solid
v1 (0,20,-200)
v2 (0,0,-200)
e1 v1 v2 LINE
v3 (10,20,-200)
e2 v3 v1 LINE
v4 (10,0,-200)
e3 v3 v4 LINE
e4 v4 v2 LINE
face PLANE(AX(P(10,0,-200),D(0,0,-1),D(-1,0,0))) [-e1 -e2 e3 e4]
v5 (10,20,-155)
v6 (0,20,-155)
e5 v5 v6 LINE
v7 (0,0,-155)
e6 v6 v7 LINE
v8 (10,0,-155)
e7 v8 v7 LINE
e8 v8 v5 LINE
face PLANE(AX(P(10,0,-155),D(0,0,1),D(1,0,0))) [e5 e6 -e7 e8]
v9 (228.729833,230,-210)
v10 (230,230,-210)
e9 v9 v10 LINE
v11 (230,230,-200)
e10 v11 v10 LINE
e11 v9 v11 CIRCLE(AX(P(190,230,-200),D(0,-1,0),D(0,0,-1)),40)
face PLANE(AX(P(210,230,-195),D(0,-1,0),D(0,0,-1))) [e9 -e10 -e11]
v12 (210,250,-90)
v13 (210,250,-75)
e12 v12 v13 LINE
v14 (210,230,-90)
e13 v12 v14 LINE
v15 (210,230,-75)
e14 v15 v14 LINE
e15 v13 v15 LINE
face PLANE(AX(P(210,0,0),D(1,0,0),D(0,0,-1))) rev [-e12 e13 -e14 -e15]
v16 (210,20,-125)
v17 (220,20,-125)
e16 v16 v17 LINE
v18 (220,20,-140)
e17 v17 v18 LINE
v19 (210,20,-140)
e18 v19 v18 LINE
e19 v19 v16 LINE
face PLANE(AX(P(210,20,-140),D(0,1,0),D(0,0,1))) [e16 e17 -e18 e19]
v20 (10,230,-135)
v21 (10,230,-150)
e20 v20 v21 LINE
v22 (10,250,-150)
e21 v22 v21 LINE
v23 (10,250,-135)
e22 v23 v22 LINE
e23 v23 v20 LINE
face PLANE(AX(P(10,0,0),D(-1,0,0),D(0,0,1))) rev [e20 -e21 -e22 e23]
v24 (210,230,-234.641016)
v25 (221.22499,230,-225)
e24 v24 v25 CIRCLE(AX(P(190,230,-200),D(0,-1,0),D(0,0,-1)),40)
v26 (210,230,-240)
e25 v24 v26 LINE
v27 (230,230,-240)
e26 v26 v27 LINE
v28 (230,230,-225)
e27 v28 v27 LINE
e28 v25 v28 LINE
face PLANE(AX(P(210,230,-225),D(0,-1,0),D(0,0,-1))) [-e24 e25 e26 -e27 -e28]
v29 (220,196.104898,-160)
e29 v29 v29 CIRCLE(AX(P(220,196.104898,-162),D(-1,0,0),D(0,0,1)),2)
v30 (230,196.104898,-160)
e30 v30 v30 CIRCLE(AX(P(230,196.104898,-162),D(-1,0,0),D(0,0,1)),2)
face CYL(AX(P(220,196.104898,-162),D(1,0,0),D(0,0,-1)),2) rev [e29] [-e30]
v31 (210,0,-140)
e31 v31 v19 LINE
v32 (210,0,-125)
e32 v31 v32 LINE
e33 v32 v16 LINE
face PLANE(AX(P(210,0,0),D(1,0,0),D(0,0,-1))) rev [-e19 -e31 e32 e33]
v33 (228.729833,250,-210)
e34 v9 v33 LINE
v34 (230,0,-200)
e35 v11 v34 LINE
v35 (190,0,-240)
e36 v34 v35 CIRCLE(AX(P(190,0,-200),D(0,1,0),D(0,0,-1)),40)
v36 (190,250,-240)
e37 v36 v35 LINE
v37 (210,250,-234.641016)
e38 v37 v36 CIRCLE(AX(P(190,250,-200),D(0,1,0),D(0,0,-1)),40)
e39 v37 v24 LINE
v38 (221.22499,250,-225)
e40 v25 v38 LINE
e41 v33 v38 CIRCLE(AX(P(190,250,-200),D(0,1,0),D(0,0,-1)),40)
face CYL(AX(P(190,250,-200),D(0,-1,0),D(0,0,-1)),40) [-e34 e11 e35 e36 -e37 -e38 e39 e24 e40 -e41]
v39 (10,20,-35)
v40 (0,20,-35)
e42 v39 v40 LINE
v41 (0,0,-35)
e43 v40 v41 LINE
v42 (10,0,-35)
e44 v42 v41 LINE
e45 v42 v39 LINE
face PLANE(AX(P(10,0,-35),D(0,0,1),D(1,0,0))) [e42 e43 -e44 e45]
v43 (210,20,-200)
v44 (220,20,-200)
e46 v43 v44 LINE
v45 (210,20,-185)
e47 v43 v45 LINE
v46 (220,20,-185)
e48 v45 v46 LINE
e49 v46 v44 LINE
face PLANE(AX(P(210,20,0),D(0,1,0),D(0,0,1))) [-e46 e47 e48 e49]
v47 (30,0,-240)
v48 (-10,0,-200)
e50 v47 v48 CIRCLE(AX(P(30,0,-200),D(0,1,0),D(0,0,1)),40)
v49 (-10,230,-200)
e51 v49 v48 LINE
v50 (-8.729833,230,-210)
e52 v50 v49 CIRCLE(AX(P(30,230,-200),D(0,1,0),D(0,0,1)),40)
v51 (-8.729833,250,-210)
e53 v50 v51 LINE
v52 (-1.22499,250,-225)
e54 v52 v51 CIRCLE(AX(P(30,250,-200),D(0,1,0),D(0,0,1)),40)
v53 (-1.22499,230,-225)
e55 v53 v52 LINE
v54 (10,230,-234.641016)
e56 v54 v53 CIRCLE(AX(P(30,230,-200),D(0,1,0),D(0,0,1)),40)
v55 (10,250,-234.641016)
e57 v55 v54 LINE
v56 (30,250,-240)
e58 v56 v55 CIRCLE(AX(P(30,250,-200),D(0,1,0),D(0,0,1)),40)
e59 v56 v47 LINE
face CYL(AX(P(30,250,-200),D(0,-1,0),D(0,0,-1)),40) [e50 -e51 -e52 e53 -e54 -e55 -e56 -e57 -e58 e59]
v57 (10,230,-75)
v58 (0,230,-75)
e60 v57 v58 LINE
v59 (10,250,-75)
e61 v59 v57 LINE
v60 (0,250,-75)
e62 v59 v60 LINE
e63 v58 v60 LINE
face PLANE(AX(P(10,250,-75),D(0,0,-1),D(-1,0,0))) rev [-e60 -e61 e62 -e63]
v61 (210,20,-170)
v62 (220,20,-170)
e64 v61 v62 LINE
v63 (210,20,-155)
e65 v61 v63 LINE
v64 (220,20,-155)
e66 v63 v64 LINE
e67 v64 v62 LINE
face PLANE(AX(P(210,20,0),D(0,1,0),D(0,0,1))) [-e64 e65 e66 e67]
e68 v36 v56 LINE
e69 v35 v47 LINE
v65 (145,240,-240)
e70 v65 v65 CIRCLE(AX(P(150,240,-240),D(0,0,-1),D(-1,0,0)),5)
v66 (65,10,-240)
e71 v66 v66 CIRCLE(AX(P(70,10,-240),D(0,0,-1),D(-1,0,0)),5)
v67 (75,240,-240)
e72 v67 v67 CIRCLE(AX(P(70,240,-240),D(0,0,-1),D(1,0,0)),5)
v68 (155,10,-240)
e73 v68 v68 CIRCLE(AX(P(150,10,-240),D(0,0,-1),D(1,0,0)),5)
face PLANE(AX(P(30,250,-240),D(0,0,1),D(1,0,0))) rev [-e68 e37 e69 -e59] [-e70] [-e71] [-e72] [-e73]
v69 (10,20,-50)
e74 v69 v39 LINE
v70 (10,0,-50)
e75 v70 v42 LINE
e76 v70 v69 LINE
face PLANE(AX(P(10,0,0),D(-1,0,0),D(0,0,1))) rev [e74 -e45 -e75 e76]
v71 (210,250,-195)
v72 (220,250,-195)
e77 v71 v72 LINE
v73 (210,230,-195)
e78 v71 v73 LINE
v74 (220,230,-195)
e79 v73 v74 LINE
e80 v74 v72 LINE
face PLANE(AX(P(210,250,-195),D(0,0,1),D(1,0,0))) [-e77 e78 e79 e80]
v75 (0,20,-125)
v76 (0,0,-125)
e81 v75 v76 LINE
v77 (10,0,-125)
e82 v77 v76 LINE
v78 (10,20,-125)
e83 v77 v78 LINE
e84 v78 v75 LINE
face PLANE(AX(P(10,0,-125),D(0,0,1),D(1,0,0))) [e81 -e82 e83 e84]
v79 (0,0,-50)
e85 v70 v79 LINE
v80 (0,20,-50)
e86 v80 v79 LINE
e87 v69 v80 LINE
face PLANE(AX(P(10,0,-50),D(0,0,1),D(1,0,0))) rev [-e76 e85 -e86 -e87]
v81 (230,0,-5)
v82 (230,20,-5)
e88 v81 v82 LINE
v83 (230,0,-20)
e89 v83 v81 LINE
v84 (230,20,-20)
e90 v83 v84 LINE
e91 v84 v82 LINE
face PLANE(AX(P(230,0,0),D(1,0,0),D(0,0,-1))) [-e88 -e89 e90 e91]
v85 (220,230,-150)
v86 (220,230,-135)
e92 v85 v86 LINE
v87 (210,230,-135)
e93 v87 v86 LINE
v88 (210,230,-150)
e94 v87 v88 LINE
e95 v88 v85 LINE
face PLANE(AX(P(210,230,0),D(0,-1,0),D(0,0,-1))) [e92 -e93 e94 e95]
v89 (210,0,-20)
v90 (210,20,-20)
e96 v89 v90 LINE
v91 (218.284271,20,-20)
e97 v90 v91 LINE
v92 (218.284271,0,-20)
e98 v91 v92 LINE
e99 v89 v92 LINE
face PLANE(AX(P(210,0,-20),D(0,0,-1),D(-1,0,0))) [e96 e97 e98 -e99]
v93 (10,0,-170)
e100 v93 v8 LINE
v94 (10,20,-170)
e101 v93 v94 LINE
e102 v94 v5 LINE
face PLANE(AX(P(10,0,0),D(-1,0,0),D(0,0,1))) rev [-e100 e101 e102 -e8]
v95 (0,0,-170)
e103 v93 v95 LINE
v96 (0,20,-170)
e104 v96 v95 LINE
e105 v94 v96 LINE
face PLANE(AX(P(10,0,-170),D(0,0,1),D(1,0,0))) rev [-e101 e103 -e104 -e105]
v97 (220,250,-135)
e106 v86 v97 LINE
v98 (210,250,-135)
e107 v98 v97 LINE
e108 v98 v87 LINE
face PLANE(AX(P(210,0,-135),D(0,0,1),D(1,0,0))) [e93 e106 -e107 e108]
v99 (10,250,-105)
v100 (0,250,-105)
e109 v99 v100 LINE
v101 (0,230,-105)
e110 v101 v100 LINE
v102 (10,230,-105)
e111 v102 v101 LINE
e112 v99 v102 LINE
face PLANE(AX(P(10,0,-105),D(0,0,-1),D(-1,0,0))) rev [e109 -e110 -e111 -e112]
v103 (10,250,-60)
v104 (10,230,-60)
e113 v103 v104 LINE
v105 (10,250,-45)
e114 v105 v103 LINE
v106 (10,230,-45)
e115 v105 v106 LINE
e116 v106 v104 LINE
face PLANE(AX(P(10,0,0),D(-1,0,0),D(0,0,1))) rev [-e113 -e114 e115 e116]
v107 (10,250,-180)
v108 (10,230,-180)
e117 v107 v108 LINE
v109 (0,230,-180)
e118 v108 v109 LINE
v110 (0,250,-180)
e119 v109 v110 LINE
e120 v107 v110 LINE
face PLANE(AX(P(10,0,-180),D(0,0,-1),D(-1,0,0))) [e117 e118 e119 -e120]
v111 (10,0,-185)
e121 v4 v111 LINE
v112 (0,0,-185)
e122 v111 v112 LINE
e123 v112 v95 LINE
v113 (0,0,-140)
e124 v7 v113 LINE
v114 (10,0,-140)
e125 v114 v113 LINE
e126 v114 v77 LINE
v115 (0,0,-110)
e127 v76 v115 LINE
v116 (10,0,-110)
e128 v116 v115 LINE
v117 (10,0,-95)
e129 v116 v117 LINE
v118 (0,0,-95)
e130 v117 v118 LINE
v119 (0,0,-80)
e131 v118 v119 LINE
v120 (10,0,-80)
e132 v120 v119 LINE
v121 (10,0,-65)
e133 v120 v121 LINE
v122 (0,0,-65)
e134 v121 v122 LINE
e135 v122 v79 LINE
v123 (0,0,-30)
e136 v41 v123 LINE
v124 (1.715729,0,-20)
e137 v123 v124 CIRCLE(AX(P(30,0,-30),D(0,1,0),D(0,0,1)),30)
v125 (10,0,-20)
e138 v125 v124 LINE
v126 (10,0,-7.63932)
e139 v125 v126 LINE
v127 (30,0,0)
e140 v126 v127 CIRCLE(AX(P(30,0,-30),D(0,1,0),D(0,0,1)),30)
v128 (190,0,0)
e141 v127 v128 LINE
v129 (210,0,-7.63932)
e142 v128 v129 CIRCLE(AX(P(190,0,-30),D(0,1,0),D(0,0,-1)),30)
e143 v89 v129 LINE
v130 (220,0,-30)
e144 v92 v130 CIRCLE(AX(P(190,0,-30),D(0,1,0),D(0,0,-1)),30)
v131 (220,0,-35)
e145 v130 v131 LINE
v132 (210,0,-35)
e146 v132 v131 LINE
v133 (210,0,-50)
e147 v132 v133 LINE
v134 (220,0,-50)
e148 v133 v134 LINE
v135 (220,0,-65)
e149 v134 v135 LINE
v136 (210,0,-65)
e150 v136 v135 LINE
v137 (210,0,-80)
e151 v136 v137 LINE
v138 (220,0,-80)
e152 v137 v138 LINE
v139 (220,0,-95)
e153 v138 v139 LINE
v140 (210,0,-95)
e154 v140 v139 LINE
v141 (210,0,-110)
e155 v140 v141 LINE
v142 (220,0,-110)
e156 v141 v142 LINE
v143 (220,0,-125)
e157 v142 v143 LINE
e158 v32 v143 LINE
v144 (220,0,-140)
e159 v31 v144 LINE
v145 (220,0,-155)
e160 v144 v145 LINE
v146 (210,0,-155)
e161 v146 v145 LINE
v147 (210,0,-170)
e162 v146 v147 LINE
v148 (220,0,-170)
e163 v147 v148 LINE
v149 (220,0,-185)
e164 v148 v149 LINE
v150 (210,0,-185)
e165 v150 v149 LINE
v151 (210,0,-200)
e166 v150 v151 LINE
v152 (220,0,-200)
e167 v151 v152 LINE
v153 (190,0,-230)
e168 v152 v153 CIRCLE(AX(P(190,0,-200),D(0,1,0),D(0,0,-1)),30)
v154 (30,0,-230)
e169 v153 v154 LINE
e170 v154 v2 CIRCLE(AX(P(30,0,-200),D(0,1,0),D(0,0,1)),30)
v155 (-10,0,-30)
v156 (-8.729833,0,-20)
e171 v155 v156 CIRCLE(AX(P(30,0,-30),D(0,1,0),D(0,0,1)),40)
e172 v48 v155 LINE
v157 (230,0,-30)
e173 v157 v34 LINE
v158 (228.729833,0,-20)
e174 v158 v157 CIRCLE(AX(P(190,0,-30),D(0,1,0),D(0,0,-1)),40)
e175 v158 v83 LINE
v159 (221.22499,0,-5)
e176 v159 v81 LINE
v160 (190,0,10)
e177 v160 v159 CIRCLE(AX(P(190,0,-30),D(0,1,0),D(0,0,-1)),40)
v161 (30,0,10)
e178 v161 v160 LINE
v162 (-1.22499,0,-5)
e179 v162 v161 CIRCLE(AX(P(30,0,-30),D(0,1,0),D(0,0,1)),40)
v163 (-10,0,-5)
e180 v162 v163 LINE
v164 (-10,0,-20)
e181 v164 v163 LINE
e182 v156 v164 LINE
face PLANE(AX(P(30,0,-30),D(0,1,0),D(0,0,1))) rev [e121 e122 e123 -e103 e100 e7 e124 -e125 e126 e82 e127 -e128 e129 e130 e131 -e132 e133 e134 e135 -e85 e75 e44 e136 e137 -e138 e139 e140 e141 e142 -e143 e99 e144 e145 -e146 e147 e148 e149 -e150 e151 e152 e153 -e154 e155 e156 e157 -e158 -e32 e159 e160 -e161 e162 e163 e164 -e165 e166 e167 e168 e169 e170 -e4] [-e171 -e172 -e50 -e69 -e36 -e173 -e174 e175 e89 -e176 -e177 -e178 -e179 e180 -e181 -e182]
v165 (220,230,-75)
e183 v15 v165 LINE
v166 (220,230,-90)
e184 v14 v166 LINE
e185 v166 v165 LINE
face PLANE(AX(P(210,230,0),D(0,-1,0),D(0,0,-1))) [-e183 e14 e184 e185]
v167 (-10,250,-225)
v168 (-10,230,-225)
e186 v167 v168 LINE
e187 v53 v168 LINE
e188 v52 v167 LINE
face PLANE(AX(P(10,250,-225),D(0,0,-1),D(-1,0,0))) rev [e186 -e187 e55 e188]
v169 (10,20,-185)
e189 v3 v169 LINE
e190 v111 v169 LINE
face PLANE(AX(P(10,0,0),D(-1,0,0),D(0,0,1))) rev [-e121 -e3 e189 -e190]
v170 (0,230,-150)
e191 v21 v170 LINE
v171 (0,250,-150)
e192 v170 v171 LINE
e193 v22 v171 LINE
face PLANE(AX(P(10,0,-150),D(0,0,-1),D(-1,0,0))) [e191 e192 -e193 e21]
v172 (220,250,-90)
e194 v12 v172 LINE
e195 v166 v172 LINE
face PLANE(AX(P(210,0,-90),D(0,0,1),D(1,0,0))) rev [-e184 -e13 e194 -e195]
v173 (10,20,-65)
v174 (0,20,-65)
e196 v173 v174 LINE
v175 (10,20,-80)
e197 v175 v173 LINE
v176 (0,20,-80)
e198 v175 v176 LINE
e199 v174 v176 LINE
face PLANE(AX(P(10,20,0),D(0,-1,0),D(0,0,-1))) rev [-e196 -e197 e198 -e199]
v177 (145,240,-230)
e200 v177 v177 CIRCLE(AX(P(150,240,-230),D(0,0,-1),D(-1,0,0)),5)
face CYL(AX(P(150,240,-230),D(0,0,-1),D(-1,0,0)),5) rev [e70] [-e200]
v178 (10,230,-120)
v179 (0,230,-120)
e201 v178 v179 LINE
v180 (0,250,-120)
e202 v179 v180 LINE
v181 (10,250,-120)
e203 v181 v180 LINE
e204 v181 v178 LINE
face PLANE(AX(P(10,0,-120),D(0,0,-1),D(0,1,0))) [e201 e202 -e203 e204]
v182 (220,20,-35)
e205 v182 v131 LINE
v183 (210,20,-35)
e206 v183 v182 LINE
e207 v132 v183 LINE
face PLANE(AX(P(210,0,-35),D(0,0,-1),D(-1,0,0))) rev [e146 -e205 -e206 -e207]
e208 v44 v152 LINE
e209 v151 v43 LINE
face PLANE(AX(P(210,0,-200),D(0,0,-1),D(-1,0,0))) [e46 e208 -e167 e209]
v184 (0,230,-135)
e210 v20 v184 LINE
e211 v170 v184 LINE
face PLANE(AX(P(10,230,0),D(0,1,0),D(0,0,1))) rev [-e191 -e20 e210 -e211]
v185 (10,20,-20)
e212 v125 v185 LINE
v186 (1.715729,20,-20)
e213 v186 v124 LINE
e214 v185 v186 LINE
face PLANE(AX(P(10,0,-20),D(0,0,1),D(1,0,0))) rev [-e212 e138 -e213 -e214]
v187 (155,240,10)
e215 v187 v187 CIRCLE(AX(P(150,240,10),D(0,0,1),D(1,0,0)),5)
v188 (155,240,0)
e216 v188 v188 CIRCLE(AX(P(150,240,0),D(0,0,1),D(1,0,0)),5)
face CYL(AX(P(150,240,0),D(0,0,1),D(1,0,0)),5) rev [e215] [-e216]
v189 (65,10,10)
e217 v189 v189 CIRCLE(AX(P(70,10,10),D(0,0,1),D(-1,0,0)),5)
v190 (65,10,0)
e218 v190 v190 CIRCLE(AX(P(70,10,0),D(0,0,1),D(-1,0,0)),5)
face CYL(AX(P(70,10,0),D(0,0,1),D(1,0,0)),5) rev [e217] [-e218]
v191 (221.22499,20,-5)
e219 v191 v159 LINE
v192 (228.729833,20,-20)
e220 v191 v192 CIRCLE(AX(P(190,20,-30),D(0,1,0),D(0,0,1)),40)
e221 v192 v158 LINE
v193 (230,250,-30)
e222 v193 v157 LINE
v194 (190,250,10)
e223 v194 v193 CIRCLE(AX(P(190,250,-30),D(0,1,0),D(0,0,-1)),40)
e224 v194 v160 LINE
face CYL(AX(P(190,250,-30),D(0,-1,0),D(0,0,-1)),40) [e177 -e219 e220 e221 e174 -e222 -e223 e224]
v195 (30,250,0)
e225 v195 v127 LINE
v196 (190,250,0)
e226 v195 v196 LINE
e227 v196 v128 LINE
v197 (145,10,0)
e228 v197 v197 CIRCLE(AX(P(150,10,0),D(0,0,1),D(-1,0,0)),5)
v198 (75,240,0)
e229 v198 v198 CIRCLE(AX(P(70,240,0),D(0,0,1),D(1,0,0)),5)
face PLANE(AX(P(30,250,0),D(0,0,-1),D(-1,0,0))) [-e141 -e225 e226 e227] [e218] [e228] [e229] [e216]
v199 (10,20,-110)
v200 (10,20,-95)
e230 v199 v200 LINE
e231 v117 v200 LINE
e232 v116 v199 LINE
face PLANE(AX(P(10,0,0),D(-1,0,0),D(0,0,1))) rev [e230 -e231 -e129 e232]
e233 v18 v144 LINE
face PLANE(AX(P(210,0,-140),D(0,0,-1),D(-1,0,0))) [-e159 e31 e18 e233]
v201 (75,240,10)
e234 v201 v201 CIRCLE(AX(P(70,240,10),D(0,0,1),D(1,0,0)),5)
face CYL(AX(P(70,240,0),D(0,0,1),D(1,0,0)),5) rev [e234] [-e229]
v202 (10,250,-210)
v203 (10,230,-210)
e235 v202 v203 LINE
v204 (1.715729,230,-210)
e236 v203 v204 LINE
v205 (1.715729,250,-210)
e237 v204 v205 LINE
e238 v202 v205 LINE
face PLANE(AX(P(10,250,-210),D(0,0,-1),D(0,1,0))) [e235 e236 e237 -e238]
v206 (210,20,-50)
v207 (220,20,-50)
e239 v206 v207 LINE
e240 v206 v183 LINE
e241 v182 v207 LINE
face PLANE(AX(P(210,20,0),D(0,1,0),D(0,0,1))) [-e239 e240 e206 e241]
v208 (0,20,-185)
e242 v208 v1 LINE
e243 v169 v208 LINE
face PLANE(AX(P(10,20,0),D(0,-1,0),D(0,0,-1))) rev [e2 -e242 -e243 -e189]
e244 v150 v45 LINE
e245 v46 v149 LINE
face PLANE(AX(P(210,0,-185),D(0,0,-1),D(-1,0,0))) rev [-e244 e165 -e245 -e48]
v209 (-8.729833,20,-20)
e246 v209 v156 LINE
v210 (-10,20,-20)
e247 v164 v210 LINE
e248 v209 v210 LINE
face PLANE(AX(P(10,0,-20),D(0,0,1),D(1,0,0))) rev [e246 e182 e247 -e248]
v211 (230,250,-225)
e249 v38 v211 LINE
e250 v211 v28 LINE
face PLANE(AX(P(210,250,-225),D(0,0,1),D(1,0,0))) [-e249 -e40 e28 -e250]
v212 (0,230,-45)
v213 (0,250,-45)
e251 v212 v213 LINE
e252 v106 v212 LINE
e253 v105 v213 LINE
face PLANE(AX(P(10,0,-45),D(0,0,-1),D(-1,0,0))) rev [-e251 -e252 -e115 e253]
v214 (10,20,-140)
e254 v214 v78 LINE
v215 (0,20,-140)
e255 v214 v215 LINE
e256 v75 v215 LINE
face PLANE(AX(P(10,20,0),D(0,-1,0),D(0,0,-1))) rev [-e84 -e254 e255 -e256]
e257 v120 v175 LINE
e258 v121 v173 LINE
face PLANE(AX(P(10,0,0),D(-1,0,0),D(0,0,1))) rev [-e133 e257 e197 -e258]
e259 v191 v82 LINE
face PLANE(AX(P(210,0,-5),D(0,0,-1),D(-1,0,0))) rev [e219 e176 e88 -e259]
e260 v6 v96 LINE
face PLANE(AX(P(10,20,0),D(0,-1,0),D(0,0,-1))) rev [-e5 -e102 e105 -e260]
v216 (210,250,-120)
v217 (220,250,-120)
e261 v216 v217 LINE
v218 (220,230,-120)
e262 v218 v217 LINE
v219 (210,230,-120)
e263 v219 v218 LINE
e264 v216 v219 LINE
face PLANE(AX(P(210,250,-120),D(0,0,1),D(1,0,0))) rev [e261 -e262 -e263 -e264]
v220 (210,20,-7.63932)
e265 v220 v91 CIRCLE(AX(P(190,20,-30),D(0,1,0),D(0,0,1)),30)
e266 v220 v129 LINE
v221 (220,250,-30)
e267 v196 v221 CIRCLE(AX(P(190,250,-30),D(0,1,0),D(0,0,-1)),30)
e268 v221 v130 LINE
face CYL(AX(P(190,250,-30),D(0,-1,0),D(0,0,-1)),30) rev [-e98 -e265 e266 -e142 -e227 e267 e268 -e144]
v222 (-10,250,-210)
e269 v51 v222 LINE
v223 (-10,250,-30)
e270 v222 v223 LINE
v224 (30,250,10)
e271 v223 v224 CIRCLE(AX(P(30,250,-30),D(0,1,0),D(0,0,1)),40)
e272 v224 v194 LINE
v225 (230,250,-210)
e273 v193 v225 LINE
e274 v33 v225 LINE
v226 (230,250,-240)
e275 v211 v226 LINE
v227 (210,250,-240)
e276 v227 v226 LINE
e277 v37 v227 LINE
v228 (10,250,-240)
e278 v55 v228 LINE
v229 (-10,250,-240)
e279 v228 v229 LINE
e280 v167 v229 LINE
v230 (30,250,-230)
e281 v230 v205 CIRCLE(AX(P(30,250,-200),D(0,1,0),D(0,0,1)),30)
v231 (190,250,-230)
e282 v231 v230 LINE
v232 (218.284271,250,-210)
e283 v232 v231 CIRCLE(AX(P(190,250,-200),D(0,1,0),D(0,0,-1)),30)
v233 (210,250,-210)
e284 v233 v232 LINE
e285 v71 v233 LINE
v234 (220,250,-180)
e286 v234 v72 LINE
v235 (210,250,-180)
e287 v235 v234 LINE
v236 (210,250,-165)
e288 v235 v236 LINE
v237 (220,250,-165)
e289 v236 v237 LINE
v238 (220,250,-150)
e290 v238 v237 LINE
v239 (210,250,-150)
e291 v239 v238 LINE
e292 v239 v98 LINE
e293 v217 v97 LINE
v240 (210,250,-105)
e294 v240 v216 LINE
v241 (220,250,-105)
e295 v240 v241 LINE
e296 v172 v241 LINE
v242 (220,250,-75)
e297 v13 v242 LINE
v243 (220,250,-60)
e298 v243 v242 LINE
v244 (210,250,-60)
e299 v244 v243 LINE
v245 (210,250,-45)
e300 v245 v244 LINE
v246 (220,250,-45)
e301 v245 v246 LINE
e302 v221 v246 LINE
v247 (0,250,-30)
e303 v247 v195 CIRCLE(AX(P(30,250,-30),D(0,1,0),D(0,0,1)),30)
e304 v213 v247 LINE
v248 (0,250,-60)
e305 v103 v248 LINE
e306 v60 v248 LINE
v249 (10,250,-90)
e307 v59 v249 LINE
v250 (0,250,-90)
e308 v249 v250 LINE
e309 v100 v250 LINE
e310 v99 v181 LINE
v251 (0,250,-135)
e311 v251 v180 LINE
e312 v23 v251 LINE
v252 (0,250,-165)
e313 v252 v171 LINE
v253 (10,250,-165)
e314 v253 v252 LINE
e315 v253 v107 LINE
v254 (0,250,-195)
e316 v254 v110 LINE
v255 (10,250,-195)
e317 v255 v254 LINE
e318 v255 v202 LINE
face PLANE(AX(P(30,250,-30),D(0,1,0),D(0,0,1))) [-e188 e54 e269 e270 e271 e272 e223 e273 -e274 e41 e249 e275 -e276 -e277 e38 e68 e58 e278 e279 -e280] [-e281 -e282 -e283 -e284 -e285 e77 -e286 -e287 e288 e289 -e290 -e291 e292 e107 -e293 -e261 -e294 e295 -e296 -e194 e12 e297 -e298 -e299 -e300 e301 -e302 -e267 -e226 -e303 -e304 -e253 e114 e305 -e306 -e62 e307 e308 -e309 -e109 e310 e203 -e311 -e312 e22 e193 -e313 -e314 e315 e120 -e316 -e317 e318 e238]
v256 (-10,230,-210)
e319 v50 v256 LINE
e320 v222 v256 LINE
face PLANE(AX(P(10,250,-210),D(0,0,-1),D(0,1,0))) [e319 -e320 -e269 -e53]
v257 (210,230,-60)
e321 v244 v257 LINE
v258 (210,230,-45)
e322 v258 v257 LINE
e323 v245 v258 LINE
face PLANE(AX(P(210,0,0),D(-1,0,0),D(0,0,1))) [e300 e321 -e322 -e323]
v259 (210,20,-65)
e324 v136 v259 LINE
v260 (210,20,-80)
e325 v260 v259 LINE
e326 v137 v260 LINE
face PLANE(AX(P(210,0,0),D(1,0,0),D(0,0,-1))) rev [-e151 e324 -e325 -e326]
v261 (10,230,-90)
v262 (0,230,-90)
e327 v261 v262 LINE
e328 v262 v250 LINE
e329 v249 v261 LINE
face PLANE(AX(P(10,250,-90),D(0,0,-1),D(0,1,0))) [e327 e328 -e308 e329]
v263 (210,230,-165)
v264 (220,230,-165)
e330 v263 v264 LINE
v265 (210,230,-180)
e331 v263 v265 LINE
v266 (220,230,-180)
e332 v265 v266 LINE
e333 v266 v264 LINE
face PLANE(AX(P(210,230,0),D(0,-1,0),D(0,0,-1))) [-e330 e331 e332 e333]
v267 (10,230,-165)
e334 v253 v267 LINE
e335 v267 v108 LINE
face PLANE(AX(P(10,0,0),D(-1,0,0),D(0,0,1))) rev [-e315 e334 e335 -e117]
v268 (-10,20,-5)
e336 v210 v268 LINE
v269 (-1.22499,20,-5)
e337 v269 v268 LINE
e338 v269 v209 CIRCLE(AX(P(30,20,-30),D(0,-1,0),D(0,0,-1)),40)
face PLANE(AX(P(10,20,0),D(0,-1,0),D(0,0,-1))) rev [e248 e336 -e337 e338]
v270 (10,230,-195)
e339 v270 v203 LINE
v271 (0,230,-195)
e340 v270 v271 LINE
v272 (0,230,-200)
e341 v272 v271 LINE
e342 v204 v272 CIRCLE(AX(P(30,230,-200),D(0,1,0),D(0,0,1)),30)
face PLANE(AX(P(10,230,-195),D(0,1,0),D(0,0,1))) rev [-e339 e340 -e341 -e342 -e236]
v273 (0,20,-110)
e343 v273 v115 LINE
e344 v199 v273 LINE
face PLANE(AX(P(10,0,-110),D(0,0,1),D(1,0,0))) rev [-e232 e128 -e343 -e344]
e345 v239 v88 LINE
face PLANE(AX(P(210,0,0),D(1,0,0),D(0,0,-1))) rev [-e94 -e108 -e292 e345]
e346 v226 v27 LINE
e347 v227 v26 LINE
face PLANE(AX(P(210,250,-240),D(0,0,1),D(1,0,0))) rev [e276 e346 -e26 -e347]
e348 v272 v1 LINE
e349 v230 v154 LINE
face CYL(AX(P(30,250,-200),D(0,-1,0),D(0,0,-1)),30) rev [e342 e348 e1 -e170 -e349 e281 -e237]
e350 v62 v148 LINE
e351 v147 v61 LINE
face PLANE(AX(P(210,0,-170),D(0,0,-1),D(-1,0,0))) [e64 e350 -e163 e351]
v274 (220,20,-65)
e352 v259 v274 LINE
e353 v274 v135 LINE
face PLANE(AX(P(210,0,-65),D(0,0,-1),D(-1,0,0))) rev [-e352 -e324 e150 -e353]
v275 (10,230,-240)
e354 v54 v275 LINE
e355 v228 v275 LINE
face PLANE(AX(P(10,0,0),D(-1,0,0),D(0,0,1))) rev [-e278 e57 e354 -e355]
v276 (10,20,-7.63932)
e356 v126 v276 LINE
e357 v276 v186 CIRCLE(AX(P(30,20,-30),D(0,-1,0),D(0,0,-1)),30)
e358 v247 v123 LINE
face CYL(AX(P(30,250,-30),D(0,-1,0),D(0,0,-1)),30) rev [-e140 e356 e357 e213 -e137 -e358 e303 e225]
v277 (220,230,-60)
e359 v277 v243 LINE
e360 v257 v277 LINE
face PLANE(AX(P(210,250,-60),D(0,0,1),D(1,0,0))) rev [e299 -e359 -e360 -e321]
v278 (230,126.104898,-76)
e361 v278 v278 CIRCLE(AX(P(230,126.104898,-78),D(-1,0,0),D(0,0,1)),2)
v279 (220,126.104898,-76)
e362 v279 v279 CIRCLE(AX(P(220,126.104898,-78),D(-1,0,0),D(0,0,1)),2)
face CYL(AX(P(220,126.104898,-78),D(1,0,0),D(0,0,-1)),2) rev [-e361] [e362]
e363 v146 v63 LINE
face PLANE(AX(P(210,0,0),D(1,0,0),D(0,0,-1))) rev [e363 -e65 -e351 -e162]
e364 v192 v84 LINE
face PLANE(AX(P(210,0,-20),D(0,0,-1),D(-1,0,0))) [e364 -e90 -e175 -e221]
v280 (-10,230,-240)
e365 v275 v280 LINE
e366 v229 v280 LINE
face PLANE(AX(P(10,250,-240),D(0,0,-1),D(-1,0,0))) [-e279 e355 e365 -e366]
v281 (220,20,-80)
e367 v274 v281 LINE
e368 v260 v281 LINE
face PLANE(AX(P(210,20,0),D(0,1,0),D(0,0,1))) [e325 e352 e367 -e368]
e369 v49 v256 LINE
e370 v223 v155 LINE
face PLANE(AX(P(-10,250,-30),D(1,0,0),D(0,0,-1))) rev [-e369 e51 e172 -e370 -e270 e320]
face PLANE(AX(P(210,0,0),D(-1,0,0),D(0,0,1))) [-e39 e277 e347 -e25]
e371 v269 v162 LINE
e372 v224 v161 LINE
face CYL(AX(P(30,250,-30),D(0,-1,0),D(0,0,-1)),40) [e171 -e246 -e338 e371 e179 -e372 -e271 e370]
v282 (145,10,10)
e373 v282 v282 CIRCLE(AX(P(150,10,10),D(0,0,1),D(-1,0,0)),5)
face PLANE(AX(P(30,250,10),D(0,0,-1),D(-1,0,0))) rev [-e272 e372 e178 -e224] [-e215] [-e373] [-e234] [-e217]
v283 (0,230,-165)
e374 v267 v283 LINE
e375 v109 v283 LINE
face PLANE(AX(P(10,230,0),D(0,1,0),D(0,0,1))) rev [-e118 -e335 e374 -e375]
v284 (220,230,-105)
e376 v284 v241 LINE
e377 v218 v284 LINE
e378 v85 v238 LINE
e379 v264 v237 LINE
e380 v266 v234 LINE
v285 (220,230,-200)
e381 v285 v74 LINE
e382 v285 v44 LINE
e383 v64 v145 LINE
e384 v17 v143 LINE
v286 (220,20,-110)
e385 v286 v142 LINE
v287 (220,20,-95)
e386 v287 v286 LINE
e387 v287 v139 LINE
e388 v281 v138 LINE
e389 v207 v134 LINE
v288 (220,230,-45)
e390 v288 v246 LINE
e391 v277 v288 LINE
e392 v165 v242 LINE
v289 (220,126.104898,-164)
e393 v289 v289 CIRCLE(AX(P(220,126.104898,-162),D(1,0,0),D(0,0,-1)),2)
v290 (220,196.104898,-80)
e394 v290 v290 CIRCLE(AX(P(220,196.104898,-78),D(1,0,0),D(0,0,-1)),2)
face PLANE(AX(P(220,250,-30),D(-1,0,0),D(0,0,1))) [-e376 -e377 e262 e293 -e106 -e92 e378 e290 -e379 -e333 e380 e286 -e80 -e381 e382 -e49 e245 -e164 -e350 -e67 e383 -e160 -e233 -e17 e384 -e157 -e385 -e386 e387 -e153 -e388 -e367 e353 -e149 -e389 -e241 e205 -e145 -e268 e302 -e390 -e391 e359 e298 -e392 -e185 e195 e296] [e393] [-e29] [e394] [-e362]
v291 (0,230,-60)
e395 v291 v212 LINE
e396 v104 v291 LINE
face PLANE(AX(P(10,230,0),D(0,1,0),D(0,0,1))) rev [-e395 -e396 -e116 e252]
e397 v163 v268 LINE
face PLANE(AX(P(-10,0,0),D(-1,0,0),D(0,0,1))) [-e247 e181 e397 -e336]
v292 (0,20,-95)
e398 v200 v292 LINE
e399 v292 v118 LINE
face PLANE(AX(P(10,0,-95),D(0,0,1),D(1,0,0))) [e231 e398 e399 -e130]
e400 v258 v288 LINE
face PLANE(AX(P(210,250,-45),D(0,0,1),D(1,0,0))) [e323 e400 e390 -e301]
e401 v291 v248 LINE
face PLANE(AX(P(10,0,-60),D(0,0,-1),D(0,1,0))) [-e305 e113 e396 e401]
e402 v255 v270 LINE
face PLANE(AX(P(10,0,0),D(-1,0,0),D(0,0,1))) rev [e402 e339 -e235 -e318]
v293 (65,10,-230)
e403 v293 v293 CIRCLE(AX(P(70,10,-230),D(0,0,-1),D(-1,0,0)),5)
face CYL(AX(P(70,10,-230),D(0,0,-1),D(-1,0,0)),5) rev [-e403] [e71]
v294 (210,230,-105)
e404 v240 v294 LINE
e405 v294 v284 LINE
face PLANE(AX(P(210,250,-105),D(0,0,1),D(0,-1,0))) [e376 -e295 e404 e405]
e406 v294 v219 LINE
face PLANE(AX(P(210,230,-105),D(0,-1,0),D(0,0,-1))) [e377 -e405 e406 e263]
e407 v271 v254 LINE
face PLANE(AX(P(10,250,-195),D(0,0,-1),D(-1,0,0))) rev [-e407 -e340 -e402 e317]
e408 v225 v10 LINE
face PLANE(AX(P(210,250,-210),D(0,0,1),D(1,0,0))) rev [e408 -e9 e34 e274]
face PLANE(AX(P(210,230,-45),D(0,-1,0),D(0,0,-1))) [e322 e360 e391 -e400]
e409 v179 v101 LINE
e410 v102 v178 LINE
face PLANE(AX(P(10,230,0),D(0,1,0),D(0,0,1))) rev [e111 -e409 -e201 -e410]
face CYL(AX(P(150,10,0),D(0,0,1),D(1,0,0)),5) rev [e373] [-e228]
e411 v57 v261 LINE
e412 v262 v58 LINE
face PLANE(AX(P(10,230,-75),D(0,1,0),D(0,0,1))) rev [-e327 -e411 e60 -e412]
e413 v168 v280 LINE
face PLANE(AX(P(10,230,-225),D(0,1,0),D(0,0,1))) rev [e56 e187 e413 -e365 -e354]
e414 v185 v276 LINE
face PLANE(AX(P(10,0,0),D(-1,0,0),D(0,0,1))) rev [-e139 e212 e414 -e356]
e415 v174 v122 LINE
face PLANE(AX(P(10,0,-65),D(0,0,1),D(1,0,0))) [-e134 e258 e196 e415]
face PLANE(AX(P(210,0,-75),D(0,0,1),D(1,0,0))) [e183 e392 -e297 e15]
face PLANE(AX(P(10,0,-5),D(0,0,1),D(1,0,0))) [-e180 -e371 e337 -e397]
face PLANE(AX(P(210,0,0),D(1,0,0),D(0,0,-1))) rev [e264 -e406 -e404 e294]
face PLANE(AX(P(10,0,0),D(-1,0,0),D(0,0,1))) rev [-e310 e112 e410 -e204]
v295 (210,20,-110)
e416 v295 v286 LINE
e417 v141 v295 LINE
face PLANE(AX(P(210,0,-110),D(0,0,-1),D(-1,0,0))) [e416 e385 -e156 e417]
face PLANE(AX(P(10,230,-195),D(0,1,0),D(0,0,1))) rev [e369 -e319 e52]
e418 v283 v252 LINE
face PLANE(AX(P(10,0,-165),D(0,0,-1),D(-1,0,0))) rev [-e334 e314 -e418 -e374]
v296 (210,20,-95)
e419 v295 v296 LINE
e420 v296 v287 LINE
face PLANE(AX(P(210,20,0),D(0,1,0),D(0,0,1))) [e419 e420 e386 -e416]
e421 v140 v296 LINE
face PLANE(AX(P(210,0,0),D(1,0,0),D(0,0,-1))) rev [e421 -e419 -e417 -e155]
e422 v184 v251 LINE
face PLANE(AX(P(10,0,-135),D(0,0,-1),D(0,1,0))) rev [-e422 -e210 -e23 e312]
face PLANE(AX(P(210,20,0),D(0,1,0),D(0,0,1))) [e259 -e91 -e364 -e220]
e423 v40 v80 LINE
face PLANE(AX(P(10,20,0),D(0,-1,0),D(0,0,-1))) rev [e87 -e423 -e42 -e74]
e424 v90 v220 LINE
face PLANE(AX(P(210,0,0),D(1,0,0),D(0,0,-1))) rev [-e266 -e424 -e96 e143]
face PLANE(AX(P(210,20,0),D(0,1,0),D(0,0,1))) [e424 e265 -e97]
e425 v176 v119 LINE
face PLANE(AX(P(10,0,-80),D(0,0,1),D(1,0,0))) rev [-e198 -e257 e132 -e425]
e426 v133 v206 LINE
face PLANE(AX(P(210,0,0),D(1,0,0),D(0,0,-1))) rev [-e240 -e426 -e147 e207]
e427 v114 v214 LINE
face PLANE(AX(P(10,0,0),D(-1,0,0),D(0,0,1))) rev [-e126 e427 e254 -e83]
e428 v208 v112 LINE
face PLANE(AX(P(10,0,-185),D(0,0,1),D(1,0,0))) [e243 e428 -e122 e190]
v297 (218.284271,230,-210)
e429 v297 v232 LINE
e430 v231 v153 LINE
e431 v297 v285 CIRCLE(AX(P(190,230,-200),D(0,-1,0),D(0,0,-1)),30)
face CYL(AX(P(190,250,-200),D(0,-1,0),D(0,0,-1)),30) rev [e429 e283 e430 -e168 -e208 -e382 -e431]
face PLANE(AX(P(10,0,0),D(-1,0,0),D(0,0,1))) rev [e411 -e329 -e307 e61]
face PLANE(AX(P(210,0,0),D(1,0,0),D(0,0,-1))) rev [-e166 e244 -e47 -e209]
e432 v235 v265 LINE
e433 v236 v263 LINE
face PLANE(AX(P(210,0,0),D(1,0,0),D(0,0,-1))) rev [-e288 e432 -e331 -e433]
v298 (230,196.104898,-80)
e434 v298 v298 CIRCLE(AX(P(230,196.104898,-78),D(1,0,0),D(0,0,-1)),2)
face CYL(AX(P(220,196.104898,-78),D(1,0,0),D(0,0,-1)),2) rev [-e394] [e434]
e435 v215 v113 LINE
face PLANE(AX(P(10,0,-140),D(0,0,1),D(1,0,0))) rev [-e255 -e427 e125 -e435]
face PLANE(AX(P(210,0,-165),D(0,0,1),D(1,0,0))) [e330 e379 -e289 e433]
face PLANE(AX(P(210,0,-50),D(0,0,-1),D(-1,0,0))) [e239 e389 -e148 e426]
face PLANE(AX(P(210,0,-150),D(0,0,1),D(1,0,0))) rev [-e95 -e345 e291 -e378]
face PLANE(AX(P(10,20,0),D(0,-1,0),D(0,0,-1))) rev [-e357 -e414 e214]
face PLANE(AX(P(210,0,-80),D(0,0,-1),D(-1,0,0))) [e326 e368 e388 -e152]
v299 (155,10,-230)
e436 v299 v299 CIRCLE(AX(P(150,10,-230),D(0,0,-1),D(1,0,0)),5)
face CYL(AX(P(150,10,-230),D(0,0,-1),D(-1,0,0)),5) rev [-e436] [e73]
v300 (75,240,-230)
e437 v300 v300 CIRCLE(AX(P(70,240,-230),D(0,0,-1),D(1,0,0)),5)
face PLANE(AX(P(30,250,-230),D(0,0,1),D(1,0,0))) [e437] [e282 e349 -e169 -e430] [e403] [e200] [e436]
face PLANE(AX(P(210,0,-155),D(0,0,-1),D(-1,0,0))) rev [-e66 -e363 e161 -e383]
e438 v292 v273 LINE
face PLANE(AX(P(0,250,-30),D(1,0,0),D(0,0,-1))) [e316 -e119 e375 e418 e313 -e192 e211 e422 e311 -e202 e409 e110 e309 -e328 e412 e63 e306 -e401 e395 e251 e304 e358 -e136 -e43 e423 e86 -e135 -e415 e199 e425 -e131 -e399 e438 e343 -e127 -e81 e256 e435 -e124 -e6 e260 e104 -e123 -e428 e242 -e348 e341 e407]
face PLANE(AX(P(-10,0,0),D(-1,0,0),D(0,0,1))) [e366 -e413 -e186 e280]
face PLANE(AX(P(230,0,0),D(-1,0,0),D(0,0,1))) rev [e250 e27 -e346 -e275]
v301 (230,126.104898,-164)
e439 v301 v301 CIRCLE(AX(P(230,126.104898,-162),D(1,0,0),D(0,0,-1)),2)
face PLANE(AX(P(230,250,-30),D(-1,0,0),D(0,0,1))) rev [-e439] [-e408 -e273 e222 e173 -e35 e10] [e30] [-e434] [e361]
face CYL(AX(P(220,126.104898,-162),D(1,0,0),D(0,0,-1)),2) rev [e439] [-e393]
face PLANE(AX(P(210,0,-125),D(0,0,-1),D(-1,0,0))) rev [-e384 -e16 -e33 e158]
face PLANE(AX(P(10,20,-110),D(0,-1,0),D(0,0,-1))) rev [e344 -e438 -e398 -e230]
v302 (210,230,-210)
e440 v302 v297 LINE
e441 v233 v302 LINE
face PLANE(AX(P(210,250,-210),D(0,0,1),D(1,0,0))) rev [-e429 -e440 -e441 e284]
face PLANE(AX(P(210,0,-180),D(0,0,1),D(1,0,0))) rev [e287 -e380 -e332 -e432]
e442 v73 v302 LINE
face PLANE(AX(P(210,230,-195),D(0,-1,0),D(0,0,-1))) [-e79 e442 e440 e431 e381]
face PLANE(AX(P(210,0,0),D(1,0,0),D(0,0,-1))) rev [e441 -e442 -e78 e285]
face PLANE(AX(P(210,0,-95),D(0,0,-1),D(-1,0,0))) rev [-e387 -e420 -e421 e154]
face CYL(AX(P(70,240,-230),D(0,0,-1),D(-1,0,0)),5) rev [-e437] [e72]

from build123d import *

# Parameters (mm, degrees)
BOSS_EXTRUDE1_DEPTH = 250
SKETCH3_W           = 15
SKETCH3_H           = 20
BOSS_EXTRUDE2_DEPTH = 20
SKETCH4_W           = 15
SKETCH4_H           = 20
BOSS_EXTRUDE3_DEPTH = 20
SKETCH8_W           = 15
SKETCH8_H           = 20
BOSS_EXTRUDE5_DEPTH = 20
SKETCH9_W           = 15
SKETCH9_H           = 20
BOSS_EXTRUDE6_DEPTH = 20
SKETCH11_R          = 2
CUT_EXTRUDE1_DEPTH  = 10
SKETCH12_R          = 5
CUT_EXTRUDE2_DEPTH  = 10
CUT_EXTRUDE3_START  = -10
SKETCH13_R          = 5
CUT_EXTRUDE3_DEPTH  = 10


with BuildPart() as part:
    # Sketch1 → Boss-Extrude1 (new body)
    with BuildSketch(Plane(origin=(0, 0, 0), x_dir=(1, 0, 0), z_dir=(0, 1, 0))):
        with BuildLine():
            Line((-10, 30), (-10, 200))
            ThreePointArc((-10, 200), (1.715728753, 228.284271247), (30, 240))
            Line((30, 240), (190, 240))
            ThreePointArc((190, 240), (218.284271247, 228.284271247), (230, 200))
            Line((230, 200), (230, 30))
            ThreePointArc((230, 30), (218.284271247, 1.715728753), (190, -10))
            Line((190, -10), (30, -10))
            ThreePointArc((30, -10), (1.715728753, 1.715728753), (-10, 30))
        make_face()
        with BuildLine():
            Line((30, 0), (190, 0))
            ThreePointArc((190, 0), (211.213203436, 8.786796564), (220, 30))
            Line((220, 30), (220, 200))
            ThreePointArc((220, 200), (211.213203436, 221.213203436), (190, 230))
            Line((190, 230), (30, 230))
            ThreePointArc((30, 230), (8.786796564, 221.213203436), (0, 200))
            Line((0, 200), (0, 30))
            ThreePointArc((0, 30), (8.786796564, 8.786796564), (30, 0))
        make_face(mode=Mode.SUBTRACT)
    extrude(amount=BOSS_EXTRUDE1_DEPTH)

    # Sketch3 → Boss-Extrude2 (add)
    with BuildSketch(Plane.ZY.offset(10)):
        with Locations((-192.5, 10)):
            Rectangle(SKETCH3_W, SKETCH3_H)
        with Locations((-162.5, 10)):
            Rectangle(SKETCH3_W, SKETCH3_H)
        with Locations((-132.5, 10)):
            Rectangle(SKETCH3_W, SKETCH3_H)
        with Locations((-102.5, 10)):
            Rectangle(SKETCH3_W, SKETCH3_H)
        with Locations((-72.5, 10)):
            Rectangle(SKETCH3_W, SKETCH3_H)
        with Locations((-42.5, 10)):
            Rectangle(SKETCH3_W, SKETCH3_H)
        with Locations((-12.5, 10)):
            Rectangle(SKETCH3_W, SKETCH3_H)
    extrude(amount=-BOSS_EXTRUDE2_DEPTH)

    # Sketch4 → Boss-Extrude3 (add)
    with BuildSketch(Plane(origin=(230, 0, 0), x_dir=(0, 0, -1), z_dir=(1, 0, 0))):
        with Locations((192.5, 10)):
            Rectangle(SKETCH4_W, SKETCH4_H)
        with Locations((162.5, 10)):
            Rectangle(SKETCH4_W, SKETCH4_H)
        with Locations((132.5, 10)):
            Rectangle(SKETCH4_W, SKETCH4_H)
        with Locations((102.5, 10)):
            Rectangle(SKETCH4_W, SKETCH4_H)
        with Locations((72.5, 10)):
            Rectangle(SKETCH4_W, SKETCH4_H)
        with Locations((42.5, 10)):
            Rectangle(SKETCH4_W, SKETCH4_H)
        with Locations((12.5, 10)):
            Rectangle(SKETCH4_W, SKETCH4_H)
    extrude(amount=-BOSS_EXTRUDE3_DEPTH)

    # Sketch8 → Boss-Extrude5 (add)
    with BuildSketch(Plane(origin=(-10, 0, 0), x_dir=(0, 0, -1), z_dir=(1, 0, 0))):
        with Locations((52.5, 240)):
            Rectangle(SKETCH8_W, SKETCH8_H)
        with Locations((82.5, 240)):
            Rectangle(SKETCH8_W, SKETCH8_H)
        with Locations((112.5, 240)):
            Rectangle(SKETCH8_W, SKETCH8_H)
        with Locations((142.5, 240)):
            Rectangle(SKETCH8_W, SKETCH8_H)
        with Locations((172.5, 240)):
            Rectangle(SKETCH8_W, SKETCH8_H)
        with Locations((202.5, 240)):
            Rectangle(SKETCH8_W, SKETCH8_H)
        with Locations((232.5, 240)):
            Rectangle(SKETCH8_W, SKETCH8_H)
    extrude(amount=BOSS_EXTRUDE5_DEPTH)

    # Sketch9 → Boss-Extrude6 (add)
    with BuildSketch(Plane(origin=(230, 0, 0), x_dir=(0, 0, -1), z_dir=(1, 0, 0))):
        with Locations((52.5, 240)):
            Rectangle(SKETCH9_W, SKETCH9_H)
        with Locations((82.5, 240)):
            Rectangle(SKETCH9_W, SKETCH9_H)
        with Locations((112.5, 240)):
            Rectangle(SKETCH9_W, SKETCH9_H)
        with Locations((142.5, 240)):
            Rectangle(SKETCH9_W, SKETCH9_H)
        with Locations((172.5, 240)):
            Rectangle(SKETCH9_W, SKETCH9_H)
        with Locations((202.5, 240)):
            Rectangle(SKETCH9_W, SKETCH9_H)
        with Locations((232.5, 240)):
            Rectangle(SKETCH9_W, SKETCH9_H)
    extrude(amount=-BOSS_EXTRUDE6_DEPTH)

    # Sketch11 → Cut-Extrude1 (cut)
    with BuildSketch(Plane(origin=(230, 0, 0), x_dir=(0, 0, -1), z_dir=(1, 0, 0))):
        with Locations((78, 196.104898216)):
            Circle(SKETCH11_R)
        with Locations((78, 126.104898216)):
            Circle(SKETCH11_R)
        with Locations((162, 126.104898216)):
            Circle(SKETCH11_R)
        with Locations((162, 196.104898216)):
            Circle(SKETCH11_R)
    extrude(amount=-CUT_EXTRUDE1_DEPTH, mode=Mode.SUBTRACT)

    # Sketch12 → Cut-Extrude2 (cut)
    with BuildSketch(Plane(origin=(0, 0, -240), x_dir=(-1, 0, 0), z_dir=(0, 0, -1))):
        with Locations((-150, 240)):
            Circle(SKETCH12_R)
        with Locations((-70, 240)):
            Circle(SKETCH12_R)
        with Locations((-70, 10)):
            Circle(SKETCH12_R)
        with Locations((-150, 10)):
            Circle(SKETCH12_R)
    extrude(amount=-CUT_EXTRUDE2_DEPTH, mode=Mode.SUBTRACT)

    # Sketch13 → Cut-Extrude3 (cut)
    with BuildSketch(Plane.XY.offset(10).offset(CUT_EXTRUDE3_START)):
        with Locations((70, 240)):
            Circle(SKETCH13_R)
        with Locations((150, 240)):
            Circle(SKETCH13_R)
        with Locations((150, 10)):
            Circle(SKETCH13_R)
        with Locations((70, 10)):
            Circle(SKETCH13_R)
    extrude(amount=CUT_EXTRUDE3_DEPTH, mode=Mode.SUBTRACT)


solid = part.part
